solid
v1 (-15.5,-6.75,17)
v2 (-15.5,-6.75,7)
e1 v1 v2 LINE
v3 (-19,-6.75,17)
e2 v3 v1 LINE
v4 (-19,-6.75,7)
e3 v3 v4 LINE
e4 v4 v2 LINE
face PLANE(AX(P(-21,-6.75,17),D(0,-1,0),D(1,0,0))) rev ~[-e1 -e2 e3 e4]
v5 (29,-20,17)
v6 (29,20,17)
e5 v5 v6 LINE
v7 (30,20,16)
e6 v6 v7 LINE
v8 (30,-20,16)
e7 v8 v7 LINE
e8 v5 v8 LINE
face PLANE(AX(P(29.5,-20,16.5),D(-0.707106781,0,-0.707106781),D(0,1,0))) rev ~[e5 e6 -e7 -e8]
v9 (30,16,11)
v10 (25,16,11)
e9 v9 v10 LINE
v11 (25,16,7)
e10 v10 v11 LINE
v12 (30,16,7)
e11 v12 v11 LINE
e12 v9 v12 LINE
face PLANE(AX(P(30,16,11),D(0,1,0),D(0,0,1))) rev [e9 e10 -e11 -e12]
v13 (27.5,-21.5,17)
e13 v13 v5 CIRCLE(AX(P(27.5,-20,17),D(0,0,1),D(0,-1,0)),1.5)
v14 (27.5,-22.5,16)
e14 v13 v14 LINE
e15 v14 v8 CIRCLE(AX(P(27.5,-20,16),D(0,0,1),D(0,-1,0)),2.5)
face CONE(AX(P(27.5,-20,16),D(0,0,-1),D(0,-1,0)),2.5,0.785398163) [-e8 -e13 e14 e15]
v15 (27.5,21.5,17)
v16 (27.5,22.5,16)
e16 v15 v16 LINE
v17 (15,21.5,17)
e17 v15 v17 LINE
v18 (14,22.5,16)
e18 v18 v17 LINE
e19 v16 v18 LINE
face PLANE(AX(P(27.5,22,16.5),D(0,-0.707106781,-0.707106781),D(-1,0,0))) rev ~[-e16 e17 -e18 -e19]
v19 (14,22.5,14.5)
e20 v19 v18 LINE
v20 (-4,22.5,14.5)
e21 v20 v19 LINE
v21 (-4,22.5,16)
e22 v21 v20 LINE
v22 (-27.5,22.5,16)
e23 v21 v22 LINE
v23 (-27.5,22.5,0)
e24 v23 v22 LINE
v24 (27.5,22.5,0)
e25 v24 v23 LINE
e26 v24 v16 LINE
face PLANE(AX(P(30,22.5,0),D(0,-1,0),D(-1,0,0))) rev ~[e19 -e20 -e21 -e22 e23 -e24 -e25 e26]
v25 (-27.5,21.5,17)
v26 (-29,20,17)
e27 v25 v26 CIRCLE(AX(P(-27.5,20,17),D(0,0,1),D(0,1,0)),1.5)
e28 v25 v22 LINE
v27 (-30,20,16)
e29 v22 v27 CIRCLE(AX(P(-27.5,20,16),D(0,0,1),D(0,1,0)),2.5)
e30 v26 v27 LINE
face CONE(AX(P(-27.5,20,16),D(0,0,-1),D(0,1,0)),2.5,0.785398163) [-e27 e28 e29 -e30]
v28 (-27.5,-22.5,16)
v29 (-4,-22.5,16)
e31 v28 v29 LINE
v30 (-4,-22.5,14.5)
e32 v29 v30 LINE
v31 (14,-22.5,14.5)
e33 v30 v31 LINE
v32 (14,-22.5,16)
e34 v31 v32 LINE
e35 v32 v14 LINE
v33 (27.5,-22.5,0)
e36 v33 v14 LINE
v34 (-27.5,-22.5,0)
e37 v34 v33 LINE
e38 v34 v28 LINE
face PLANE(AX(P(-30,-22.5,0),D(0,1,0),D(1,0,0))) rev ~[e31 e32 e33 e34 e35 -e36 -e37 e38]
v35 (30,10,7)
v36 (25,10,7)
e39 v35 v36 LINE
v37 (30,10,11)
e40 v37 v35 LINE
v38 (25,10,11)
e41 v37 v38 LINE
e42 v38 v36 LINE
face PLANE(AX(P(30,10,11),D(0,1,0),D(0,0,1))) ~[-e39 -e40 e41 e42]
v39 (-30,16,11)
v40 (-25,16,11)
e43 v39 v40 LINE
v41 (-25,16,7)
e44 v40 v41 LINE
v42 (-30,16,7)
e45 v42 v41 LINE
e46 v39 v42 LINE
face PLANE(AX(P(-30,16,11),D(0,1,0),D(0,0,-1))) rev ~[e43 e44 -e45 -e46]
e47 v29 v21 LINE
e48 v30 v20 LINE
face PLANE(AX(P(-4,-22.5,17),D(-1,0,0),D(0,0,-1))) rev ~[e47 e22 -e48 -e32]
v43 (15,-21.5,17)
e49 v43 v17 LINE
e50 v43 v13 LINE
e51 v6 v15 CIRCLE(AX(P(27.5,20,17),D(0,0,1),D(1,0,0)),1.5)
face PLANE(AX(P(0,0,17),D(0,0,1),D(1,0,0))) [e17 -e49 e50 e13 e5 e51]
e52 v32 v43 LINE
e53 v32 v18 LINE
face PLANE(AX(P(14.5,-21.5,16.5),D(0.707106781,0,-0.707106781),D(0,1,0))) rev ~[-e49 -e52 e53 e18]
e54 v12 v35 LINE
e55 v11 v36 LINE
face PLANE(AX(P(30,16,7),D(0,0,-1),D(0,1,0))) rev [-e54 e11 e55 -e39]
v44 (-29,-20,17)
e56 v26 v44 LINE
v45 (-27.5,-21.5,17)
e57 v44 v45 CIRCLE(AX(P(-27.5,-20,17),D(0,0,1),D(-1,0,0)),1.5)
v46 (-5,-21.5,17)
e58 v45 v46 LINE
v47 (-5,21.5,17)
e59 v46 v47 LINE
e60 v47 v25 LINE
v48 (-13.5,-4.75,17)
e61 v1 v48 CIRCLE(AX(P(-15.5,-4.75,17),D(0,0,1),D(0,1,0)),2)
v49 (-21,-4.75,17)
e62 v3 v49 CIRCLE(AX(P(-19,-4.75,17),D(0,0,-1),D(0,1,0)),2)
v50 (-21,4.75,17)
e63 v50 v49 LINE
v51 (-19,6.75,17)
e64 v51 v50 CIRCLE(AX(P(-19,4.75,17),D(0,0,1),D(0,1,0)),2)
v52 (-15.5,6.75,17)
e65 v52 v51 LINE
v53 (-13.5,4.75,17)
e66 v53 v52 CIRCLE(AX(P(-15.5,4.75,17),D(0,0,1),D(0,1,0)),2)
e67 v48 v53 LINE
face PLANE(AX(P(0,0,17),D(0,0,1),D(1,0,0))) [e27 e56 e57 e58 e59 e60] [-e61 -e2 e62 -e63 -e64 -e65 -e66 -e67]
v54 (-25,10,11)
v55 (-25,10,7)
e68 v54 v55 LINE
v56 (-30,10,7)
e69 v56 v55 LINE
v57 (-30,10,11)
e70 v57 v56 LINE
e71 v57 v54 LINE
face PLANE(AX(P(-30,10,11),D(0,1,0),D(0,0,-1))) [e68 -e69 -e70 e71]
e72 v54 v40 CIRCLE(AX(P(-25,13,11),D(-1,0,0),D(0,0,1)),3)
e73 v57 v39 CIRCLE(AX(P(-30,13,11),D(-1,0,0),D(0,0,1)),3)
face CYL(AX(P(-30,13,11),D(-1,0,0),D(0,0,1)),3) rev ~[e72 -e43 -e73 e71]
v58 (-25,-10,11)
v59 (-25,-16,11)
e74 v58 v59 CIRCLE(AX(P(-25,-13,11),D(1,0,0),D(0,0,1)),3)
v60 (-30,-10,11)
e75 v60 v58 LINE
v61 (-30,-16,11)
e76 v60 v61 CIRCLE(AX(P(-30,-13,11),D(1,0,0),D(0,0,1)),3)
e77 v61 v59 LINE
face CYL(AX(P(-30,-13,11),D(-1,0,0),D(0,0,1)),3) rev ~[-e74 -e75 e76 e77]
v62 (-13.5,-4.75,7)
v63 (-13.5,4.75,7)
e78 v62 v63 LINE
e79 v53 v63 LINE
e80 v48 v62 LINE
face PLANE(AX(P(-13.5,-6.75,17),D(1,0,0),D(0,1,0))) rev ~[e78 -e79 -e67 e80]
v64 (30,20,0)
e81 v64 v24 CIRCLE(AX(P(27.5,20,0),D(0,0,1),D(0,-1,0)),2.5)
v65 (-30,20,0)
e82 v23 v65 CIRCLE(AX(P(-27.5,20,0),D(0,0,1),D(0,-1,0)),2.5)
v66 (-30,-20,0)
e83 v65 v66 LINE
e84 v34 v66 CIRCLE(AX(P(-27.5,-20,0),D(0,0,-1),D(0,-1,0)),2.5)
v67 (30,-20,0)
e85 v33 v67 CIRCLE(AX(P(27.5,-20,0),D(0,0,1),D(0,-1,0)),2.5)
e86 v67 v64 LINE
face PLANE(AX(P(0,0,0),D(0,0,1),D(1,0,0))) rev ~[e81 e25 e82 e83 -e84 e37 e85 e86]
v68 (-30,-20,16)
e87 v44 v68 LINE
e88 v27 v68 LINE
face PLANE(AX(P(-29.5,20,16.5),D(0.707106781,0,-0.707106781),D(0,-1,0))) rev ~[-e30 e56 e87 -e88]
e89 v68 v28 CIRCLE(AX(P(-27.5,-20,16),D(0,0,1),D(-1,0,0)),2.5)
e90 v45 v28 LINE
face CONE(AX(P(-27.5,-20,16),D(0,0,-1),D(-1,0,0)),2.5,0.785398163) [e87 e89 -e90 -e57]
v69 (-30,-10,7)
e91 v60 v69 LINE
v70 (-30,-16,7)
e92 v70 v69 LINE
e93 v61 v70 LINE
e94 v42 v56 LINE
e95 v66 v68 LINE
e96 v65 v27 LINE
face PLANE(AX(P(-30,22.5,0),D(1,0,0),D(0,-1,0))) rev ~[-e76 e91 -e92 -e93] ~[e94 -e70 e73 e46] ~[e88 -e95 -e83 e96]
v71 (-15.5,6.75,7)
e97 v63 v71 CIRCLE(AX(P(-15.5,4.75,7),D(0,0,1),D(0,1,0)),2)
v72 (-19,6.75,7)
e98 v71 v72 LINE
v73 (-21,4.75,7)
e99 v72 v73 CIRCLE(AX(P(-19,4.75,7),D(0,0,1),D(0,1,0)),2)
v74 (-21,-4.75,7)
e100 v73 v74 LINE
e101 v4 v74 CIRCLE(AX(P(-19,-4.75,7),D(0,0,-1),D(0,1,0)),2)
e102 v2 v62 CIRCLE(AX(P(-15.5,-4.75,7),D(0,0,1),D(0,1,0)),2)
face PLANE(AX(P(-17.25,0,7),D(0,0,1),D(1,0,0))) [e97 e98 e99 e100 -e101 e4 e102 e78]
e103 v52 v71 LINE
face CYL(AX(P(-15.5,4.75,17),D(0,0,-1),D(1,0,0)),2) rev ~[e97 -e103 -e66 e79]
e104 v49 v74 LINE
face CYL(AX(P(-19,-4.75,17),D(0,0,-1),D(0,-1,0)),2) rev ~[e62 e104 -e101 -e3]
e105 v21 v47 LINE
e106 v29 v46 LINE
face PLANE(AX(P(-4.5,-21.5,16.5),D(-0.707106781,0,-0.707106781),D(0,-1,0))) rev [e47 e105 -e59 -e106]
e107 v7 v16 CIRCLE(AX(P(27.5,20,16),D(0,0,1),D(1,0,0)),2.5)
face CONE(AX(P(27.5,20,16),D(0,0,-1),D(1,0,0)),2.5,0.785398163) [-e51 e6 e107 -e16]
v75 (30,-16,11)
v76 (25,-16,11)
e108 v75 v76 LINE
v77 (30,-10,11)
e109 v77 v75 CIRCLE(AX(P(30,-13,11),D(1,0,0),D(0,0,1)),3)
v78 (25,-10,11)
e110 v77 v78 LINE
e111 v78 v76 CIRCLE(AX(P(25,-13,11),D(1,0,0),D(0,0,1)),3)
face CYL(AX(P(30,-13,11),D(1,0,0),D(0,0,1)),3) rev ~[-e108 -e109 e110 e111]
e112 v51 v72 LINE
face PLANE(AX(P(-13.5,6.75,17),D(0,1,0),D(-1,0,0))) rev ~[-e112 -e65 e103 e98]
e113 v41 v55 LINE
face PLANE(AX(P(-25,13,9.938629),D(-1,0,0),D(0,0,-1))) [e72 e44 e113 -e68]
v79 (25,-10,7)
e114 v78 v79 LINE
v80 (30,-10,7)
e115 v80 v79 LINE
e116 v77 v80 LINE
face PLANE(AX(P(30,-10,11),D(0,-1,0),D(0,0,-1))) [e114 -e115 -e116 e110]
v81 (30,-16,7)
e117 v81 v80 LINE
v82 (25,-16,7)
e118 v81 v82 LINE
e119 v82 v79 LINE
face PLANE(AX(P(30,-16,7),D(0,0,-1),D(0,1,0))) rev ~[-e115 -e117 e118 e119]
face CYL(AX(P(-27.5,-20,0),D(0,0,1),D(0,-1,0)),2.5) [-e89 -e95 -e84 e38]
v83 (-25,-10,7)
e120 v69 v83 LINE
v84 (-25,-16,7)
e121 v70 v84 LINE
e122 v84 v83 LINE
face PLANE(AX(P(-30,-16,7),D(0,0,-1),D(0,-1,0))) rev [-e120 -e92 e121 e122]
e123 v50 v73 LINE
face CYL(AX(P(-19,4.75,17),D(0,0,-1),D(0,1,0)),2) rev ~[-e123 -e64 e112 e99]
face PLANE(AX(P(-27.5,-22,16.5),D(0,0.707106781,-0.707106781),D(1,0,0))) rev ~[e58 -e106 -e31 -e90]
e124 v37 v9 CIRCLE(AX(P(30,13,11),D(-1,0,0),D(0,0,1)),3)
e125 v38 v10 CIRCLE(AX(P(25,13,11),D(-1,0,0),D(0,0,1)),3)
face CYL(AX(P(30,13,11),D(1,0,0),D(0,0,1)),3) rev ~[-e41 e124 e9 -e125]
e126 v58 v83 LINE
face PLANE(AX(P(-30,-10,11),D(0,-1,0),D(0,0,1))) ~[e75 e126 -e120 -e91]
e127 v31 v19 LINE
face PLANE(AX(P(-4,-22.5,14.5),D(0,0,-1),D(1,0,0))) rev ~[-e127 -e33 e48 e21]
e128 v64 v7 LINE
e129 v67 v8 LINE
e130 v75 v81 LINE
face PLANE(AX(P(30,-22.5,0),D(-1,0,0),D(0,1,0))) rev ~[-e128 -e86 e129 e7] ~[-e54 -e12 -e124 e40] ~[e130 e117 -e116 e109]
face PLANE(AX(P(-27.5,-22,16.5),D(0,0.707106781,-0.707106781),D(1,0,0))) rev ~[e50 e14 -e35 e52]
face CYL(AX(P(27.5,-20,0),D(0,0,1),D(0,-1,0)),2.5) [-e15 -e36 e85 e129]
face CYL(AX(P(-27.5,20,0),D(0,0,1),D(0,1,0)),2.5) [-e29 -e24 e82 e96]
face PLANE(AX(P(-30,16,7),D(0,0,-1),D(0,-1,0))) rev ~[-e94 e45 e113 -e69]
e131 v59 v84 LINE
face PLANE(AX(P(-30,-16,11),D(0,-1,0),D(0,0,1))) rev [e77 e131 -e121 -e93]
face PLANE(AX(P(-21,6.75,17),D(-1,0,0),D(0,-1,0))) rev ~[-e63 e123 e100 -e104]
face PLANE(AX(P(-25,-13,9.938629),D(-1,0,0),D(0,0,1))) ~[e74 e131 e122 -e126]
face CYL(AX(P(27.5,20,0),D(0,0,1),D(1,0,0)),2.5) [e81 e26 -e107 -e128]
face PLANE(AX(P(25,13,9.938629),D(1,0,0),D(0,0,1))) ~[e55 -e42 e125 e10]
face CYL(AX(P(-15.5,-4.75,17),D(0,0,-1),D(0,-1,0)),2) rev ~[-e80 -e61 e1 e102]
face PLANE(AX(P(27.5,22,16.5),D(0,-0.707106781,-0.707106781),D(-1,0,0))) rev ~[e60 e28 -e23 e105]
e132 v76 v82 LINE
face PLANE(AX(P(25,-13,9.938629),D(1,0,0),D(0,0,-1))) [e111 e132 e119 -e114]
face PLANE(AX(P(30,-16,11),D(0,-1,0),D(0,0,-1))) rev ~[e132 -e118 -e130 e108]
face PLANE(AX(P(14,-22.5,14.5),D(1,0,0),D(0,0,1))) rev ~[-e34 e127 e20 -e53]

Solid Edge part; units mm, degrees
sketch "Sketch1" plane through (0, 0, 0) normal (0, 0, 1) x (1, 0, 0)
  line L0 (-30, -22.5) -> (30, -22.5)
  line L1 (30, -22.5) -> (30, 22.5)
  line L2 (30, 22.5) -> (-30, 22.5)
  line L3 (-30, 22.5) -> (-30, -22.5)
  dimension "D1" = 60
  dimension "D2" = 45
extrude "Protrusion1" add sketch "Sketch1" along normal blind 17
fillet "Verrundung_1" radius 2.5 4 edges at (-30, 22.5, 8.5) (30, 22.5, 8.5) (30, -22.5, 8.5) (-30, -22.5, 8.5)
chamfer "Fase_1" distance 1 angle 45 7 edges at (30, 0, 17) (0, 22.5, 17) (-29.2678, 21.7678, 17) (-30, 0, 17) (-29.2678, -21.7678, 17) (0, -22.5, 17) (29.2678, -21.7678, 17)
sketch "Sketch2" plane through (-30, 0, 4.75) normal (-1, 0, 0) x (0, 0, 1)
  line L0 (6.25, 16) -> (2.25, 16)
  line L1 (2.25, 16) -> (2.25, 10)
  line L2 (6.25, 10) -> (2.25, 10)
  arc A0 (6.25, 10) -> (6.25, 16) centre (6.25, 13) ccw
extrude "ExtrudedCutout_5" cut sketch "Sketch2" against normal blind 5
mirror "Mirror1" about plane through (0, 0, 0) normal (0, -1, 0) of "ExtrudedCutout_5"
mirror "Mirror2" about plane through (0, 0, 0) normal (1, 0, 0) of "Mirror1", "ExtrudedCutout_5"
sketch "Sketch3" plane through (0, -22.5, 4.75) normal (0, -1, 0) x (1, 0, 0)
  line L0 (-4, 12.25) -> (-4, 9.75)
  line L1 (-4, 9.75) -> (14, 9.75)
  line L2 (14, 9.75) -> (14, 12.25)
  dimension "D1" = 18
  dimension "D2" = 2.5
  dimension "D3" = 16
extrude "ExtrudedCutout_7" cut sketch "Sketch3" against normal blind 55.5038 material side at (-3.95, -22.5, 15.75)
chamfer "Chamfer_3" distance 1 angle 45 2 edges at (14, 0, 17) (-4, 0, 17)
sketch "Sketch4" plane through (-17, 0, 17) normal (0, 0, 1) x (1, 0, 0)
  line L0 (-4, -6.75) -> (3.5, -6.75)
  line L1 (3.5, -6.75) -> (3.5, 6.75)
  line L2 (3.5, 6.75) -> (-4, 6.75)
  line L3 (-4, 6.75) -> (-4, -6.75)
  dimension "D1" = 9
  dimension "D2" = 7.5
  dimension "D3" = 13.5
extrude "ExtrudedCutout_8" cut sketch "Sketch4" against normal blind 10
fillet "Round_3" radius 2 4 edges at (-21, 6.75, 12) (-13.5, 6.75, 12) (-13.5, -6.75, 12) (-21, -6.75, 12)
